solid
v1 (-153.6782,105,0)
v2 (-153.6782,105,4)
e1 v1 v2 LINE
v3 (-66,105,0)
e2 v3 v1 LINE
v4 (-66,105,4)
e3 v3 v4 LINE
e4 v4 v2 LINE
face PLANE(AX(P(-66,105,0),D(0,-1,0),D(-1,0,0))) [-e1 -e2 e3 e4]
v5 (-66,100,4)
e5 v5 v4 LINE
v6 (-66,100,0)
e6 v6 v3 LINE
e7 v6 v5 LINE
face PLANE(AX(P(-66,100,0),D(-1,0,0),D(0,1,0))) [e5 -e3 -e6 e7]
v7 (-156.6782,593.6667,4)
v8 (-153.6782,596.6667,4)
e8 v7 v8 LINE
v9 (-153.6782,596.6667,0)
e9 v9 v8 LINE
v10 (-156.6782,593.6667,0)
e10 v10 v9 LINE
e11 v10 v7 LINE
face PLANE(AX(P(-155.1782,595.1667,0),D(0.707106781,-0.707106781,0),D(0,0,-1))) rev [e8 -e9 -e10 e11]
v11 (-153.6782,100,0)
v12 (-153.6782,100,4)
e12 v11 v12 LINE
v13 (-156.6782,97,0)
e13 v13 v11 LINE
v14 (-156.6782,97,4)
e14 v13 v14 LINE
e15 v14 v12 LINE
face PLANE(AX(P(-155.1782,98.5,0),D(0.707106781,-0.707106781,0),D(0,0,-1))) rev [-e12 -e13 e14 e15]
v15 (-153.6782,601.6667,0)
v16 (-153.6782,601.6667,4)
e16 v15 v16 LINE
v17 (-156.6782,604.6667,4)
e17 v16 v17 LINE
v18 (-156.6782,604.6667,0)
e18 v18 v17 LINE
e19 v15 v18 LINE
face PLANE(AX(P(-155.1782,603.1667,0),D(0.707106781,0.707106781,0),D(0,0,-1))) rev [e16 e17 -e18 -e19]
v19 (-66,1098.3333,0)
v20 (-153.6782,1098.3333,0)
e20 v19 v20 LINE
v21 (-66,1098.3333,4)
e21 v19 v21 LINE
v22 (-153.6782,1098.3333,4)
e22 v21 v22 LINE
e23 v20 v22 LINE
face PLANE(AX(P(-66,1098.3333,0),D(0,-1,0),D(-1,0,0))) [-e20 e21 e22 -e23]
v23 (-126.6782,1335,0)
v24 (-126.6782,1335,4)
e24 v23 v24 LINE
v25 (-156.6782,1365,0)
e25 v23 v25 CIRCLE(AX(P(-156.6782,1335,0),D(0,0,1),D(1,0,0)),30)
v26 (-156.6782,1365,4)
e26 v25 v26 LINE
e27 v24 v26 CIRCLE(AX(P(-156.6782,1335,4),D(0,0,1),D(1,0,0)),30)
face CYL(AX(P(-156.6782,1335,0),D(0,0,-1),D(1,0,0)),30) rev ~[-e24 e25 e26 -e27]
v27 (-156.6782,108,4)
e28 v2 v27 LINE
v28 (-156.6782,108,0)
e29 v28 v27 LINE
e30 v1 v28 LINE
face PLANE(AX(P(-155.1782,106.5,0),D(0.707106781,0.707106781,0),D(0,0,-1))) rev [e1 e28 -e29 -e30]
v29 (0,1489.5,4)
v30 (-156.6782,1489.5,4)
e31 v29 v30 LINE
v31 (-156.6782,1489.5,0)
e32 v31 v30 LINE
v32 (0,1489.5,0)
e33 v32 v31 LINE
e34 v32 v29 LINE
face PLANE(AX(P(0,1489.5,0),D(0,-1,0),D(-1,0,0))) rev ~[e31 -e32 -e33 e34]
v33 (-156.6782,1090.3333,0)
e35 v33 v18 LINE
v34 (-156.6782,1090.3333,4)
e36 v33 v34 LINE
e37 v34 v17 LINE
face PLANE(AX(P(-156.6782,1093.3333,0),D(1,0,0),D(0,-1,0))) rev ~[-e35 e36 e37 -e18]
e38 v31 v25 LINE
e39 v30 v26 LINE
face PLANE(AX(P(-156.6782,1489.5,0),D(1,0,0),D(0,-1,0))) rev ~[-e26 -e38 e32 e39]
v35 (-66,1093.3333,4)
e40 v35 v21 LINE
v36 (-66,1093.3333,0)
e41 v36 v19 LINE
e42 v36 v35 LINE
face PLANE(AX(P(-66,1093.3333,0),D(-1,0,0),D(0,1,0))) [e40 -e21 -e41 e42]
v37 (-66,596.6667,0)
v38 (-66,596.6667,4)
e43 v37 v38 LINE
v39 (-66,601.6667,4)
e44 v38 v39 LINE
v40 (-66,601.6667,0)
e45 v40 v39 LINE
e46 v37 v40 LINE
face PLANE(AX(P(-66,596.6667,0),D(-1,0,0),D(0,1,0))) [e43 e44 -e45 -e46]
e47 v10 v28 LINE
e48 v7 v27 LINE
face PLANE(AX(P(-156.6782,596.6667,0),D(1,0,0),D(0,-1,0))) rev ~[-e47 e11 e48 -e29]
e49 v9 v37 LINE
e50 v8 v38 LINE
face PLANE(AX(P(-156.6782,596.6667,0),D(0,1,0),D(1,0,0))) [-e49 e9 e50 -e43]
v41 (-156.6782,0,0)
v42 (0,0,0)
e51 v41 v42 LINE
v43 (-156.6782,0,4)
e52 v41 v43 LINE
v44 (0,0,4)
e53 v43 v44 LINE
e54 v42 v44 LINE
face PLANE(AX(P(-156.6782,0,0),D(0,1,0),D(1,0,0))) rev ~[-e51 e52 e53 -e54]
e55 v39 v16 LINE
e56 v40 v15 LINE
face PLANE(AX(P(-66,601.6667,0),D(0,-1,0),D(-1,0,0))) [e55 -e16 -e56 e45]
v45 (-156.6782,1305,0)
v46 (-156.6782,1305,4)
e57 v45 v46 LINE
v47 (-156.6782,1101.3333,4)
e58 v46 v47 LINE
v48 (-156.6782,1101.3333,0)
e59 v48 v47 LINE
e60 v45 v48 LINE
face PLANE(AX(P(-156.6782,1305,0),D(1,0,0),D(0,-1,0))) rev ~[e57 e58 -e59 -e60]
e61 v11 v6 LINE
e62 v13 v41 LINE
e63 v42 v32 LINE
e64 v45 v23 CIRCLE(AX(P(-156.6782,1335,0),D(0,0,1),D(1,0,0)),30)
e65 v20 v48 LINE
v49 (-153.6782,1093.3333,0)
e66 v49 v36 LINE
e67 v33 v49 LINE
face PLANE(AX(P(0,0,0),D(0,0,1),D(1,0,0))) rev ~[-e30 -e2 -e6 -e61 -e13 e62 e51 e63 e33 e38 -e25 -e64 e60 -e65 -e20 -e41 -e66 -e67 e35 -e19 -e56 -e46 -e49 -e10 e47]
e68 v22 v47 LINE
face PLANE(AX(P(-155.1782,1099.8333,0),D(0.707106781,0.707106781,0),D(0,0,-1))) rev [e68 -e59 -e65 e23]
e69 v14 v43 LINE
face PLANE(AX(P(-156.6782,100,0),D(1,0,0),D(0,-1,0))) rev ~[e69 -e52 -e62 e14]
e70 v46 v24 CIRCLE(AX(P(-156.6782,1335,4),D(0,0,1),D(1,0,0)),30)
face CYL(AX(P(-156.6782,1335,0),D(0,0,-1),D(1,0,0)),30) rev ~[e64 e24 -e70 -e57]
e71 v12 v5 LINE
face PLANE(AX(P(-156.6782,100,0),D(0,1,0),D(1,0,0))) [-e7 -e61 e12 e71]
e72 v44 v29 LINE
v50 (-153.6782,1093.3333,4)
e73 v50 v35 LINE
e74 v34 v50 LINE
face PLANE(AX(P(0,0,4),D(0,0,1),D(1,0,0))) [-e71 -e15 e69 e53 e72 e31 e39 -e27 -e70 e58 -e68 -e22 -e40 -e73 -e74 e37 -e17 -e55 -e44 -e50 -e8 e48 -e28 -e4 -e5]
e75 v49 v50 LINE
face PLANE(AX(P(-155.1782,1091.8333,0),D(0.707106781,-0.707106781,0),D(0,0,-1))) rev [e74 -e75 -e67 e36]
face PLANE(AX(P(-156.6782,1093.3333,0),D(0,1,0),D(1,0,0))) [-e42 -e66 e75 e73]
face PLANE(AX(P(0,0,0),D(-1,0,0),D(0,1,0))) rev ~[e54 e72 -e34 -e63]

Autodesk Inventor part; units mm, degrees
ref_plane "YZ Plane" through (0, 0, 0) normal (1, 0, 0) x (0, 1, 0)
ref_plane "XZ Plane" through (0, 0, 0) normal (0, 1, 0) x (-1, 0, 0)
ref_plane "XY Plane" through (0, 0, 0) normal (0, 0, 1) x (1, 0, 0)
sketch "Sketch1" plane through (0, 0, 0) normal (0, 0, 1) x (1, 0, 0)
  line L0 (0, 1489.5) -> (-156.6782, 1489.5)
  line L1 (-156.6782, 1489.5) -> (-156.6782, 0)
  line L2 (-156.6782, 0) -> (0, 0)
  line L3 (0, 0) -> (0, 1489.5)
  line L4 (-156.6782, 100) -> (-66, 100)
  line L5 (-66, 100) -> (-66, 105)
  line L6 (-66, 105) -> (-156.6782, 105)
  line L7 (-156.6782, 105) -> (-156.6782, 100)
  line L8 (-156.6782, 596.6667) -> (-66, 596.6667)
  line L9 (-66, 596.6667) -> (-66, 601.6667)
  line L10 (-66, 601.6667) -> (-156.6782, 601.6667)
  line L11 (-156.6782, 601.6667) -> (-156.6782, 596.6667)
  line L12 (-156.6782, 1093.3333) -> (-66, 1093.3333)
  line L13 (-66, 1093.3333) -> (-66, 1098.3333)
  line L14 (-66, 1098.3333) -> (-156.6782, 1098.3333)
  line L15 (-156.6782, 1098.3333) -> (-156.6782, 1093.3333)
  circle A0 centre (-156.6782, 1335) radius 30
  point P0 (-156.6782, 1098.3333)
  point P1 (-156.6782, 1093.3333)
  point P2 (-156.6782, 105)
  point P3 (-156.6782, 1365)
  point P4 (-156.6782, 1305)
  dimension "d0" = 1489.5
  dimension "d1" = 156.6782
  dimension "d2" = 5
  dimension "d4" = 100
  dimension "d7" = 496.6667
  dimension "d23" = 66
  dimension "d29" = 60
  dimension "d30" = 1335
extrude "Plate1" add sketch "Sketch1" along normal blind 4 contours L3 L2 L1 L4 L5 L6 L8 L9 L10 L12 L13 L14 A0 L0
chamfer "Corner Chamfer1" distance 3 angle 45 6 edges at (-156.6782, 100, 2) (-156.6782, 105, 2) (-156.6782, 596.6667, 2) (-156.6782, 601.6667, 2) (-156.6782, 1098.3333, 2) (-156.6782, 1093.3333, 2)
equation "\"d0\" = Стрингер_длина"
equation "\"d1\" = стрингер_глубина_4"
equation "\"d2\" = паз_под_стрингер_толщина"
equation "\"d7\" = Шаг_шпангоутов"
equation "\"d23\" = паз_под_стрингер_глубина - Thickness"
equation "\"d29\" = 2 * радиус_выреза_под_сварку"
equation "\"d12\" = Thickness"
equation "\"BendRadius\" = Thickness"
equation "\"BendReliefWidth\" = Thickness"
equation "\"BendReliefDepth\" = 0.5 * Thickness"
equation "\"CornerReliefSize\" = 4 * Thickness"
equation "\"MinimumRemnant\" = 2 * Thickness"
equation "\"TransitionRadius\" = BendRadius"
equation "\"JacobiRadiusSize\" = BendRadius"
equation "\"GapSize\" = Thickness"
equation "\"Стрингер_длина\" = 1489.5"
equation "\"стрингер_глубина_4\" = 156.678203"
equation "\"паз_под_стрингер_толщина\" = 5"
equation "\"Шаг_шпангоутов\" = 496.666667"
equation "\"паз_под_стрингер_глубина\" = 70"
equation "\"Thickness\" = 4"
equation "\"радиус_выреза_под_сварку\" = 30"
properties part number "GBK 3214 stringer 4" material "Steel"
